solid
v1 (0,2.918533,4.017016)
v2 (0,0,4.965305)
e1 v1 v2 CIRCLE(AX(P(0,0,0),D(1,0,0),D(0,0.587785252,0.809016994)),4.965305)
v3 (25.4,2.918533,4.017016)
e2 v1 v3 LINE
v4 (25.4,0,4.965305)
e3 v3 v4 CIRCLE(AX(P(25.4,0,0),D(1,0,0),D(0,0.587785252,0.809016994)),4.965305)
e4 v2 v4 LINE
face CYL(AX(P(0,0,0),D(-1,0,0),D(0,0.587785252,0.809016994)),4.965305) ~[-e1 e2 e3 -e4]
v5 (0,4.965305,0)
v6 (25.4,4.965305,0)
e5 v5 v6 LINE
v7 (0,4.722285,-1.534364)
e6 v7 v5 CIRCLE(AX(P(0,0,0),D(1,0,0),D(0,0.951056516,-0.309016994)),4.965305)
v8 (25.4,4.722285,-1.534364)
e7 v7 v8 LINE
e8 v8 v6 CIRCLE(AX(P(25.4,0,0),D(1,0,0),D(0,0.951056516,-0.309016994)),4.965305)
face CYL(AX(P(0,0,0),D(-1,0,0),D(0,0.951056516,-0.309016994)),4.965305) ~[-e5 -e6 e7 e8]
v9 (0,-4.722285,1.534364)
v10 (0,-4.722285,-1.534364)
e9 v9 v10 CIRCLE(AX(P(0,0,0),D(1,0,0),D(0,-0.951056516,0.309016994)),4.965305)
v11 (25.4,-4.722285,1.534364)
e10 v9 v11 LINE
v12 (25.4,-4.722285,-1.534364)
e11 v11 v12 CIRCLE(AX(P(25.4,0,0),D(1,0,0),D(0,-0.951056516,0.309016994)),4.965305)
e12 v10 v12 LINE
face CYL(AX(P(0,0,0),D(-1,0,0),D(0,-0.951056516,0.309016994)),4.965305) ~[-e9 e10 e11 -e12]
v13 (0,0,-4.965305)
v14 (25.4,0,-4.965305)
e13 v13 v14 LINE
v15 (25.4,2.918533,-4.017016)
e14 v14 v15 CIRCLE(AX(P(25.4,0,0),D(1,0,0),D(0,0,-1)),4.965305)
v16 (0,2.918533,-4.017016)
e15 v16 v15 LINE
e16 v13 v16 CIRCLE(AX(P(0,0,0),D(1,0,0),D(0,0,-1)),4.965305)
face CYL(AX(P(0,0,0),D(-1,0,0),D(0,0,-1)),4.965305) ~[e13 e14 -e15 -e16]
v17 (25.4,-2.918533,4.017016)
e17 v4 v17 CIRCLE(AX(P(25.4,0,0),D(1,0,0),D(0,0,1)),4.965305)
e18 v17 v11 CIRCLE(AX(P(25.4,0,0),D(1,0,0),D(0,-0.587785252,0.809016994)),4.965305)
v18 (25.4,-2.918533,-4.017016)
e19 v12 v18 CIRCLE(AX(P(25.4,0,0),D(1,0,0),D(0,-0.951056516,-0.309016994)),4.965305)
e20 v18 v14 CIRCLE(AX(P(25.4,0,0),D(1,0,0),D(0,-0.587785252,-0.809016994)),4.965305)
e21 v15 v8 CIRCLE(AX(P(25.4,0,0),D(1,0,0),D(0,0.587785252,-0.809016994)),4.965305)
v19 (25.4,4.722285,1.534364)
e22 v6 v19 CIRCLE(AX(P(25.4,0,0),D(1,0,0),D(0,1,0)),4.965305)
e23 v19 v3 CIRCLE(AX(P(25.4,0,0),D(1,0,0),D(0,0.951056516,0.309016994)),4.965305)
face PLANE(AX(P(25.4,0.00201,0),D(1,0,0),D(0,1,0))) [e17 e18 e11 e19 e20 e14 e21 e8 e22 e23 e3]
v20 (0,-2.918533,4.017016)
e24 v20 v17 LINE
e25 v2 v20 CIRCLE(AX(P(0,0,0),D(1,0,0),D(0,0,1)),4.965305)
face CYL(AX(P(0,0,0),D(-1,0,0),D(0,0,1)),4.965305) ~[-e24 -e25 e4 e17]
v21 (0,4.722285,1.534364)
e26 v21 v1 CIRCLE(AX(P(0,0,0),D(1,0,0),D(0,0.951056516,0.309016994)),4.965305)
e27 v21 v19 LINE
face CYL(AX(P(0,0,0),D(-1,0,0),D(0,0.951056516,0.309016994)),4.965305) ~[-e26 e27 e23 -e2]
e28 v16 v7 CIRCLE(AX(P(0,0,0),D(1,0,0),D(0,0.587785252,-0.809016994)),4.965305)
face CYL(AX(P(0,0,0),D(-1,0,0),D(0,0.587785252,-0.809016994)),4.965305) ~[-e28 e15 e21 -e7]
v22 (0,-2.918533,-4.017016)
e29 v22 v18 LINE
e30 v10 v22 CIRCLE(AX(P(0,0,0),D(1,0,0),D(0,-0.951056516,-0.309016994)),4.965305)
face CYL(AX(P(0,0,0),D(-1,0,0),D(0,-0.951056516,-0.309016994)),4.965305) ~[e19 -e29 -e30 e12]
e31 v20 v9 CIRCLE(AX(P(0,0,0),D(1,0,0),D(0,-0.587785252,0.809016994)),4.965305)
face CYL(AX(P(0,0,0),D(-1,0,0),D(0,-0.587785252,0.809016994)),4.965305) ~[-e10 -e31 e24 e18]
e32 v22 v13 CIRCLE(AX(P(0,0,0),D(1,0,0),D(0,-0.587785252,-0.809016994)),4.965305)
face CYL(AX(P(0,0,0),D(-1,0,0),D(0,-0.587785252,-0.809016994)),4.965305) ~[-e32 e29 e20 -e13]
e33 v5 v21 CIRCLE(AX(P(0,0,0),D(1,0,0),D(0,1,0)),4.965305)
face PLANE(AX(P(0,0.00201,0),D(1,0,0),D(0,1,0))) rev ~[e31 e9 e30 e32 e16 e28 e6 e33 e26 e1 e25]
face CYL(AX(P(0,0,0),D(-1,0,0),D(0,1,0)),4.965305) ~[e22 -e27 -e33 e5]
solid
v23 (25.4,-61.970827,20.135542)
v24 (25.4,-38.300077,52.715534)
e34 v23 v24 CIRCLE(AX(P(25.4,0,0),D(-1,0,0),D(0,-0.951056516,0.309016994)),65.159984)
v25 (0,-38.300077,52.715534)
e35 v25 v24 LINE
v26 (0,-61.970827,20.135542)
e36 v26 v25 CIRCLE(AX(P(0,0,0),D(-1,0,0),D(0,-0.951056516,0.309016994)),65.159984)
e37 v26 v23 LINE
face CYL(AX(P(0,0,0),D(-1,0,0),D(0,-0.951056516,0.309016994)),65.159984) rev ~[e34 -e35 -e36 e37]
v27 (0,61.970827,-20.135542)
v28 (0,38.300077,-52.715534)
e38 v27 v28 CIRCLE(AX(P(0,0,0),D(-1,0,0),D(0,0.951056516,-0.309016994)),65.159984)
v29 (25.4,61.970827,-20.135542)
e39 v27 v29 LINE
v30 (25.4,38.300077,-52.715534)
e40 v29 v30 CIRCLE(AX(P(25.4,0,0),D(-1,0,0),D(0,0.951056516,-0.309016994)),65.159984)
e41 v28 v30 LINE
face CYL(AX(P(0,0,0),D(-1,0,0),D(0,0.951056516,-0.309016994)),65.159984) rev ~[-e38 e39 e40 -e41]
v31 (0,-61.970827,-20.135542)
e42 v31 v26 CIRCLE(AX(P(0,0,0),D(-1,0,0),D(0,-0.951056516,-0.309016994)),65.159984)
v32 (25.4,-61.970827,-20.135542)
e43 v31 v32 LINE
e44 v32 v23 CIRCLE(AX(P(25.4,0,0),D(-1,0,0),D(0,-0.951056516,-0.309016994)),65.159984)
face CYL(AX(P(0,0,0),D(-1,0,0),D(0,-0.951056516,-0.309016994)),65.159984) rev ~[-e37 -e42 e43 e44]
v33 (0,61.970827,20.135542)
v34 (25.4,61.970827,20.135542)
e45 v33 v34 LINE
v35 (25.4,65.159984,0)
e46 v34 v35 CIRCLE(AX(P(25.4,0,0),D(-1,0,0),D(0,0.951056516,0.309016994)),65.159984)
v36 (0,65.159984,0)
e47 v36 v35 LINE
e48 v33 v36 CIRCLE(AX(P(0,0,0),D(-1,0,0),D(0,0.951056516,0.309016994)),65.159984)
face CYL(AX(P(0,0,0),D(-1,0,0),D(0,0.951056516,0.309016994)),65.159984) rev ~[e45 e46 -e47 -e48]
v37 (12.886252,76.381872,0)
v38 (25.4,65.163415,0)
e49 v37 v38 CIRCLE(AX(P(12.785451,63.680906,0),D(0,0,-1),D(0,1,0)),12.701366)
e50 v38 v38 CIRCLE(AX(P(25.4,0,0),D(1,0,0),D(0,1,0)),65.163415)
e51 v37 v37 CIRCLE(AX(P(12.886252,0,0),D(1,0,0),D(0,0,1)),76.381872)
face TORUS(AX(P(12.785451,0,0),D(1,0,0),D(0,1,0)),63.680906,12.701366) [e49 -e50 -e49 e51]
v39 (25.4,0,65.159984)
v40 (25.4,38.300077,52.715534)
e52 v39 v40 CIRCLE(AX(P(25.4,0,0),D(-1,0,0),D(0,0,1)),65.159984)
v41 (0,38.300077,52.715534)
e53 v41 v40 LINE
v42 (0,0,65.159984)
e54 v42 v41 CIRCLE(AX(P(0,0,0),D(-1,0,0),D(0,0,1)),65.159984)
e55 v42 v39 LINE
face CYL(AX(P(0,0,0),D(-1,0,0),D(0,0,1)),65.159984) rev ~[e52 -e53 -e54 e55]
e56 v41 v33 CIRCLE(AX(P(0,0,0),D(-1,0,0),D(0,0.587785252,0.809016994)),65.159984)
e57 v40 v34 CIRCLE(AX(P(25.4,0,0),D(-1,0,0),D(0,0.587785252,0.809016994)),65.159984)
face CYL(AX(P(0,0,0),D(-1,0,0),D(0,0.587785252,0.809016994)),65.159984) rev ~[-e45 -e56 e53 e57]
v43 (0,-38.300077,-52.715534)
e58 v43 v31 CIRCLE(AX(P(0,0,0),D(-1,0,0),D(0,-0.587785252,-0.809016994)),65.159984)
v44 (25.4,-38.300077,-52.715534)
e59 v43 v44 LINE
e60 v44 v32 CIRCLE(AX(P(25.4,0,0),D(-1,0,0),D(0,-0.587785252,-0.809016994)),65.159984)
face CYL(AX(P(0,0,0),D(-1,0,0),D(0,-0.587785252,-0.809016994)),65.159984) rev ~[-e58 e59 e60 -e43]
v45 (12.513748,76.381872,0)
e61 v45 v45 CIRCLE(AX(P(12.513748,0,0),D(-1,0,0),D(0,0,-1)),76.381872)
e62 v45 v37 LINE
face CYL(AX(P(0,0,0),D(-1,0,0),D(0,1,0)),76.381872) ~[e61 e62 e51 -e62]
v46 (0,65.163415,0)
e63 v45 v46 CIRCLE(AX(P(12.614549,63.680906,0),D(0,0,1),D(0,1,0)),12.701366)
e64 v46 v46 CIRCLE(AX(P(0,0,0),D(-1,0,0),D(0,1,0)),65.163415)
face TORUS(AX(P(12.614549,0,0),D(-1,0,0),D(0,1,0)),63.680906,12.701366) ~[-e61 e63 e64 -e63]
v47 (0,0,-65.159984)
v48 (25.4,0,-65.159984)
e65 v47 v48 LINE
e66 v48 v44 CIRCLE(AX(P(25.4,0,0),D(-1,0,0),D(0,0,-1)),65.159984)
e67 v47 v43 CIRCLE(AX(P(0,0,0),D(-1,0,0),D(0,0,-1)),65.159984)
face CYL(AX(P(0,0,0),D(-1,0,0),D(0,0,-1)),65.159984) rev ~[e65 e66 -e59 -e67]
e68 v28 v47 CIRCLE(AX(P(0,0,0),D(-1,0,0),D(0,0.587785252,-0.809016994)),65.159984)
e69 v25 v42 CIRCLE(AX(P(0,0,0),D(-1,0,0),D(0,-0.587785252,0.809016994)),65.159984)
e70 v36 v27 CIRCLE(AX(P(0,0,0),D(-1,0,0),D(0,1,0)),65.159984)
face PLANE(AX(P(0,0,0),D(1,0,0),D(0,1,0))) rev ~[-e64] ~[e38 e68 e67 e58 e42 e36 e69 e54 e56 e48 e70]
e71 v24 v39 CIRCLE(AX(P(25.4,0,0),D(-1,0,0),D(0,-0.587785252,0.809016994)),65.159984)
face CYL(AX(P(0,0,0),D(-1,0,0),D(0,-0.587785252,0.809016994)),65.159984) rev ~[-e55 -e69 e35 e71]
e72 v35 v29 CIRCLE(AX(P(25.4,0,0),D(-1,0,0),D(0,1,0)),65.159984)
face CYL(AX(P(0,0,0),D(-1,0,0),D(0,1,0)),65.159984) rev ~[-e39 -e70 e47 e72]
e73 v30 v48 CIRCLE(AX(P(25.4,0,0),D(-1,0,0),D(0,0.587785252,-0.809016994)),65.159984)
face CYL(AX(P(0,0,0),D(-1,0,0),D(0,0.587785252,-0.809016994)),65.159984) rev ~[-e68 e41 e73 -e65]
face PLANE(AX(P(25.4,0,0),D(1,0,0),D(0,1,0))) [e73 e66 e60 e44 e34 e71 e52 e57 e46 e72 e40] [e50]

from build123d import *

# Parameters (mm, degrees)
F0_R     = 76.3818717889
F3_DEPTH = 25.4
F4_DEPTH = 25.4


# Not quite as in the source:
# - a fillet or chamfer that OpenCascade refuses, or shapes differently, is made with other operations: its cross-section is extruded or revolved along the edge and cut away or added
# - the program builds the solid bodies; features that only make, move or delete a surface that nothing else refers to are left out


with BuildPart() as f3:
    # F0 (on Right) → F3 (new body)
    with BuildSketch(Plane.YZ):
        Circle(F0_R)
        with BuildLine():
            ThreePointArc((61.9708271601, 20.1355423362), (64.3577562368, 10.1932672021), (65.1599837637, 0))
            ThreePointArc((65.1599837637, 0), (64.3577562368, -10.1932672021), (61.9708271601, -20.1355423362))
            ThreePointArc((61.9708271601, -20.1355423362), (52.715534218, -38.3000774959), (38.3000774959, -52.715534218))
            ThreePointArc((38.3000774959, -52.715534218), (20.1355423362, -61.9708271601), (0, -65.1599837637))
            ThreePointArc((0, -65.1599837637), (-20.1355423362, -61.9708271601), (-38.3000774959, -52.715534218))
            ThreePointArc((-38.3000774959, -52.715534218), (-52.715534218, -38.3000774959), (-61.9708271601, -20.1355423362))
            ThreePointArc((-61.9708271601, -20.1355423362), (-65.1599837637, 0), (-61.9708271601, 20.1355423362))
            ThreePointArc((-61.9708271601, 20.1355423362), (-52.715534218, 38.3000774959), (-38.3000774959, 52.715534218))
            ThreePointArc((-38.3000774959, 52.715534218), (-20.1355423362, 61.9708271601), (0, 65.1599837637))
            ThreePointArc((0, 65.1599837637), (20.1355423362, 61.9708271601), (38.3000774959, 52.715534218))
            ThreePointArc((38.3000774959, 52.715534218), (52.715534218, 38.3000774959), (61.9708271601, 20.1355423362))
        make_face(mode=Mode.SUBTRACT)
    extrude(amount=F3_DEPTH)

    # F5: fillet of radius 12.7 on 1 edges, made by hand

    # F5_s1 → F5_t2 (revolve, cut)
    with BuildSketch(Plane.XY):
        with BuildLine():
            ThreePointArc((12.7854505187, 76.3822717889), (21.2275412664, 73.1706792347), (25.4003972784, 65.1600303453))
            Line((25.4003972784, 65.1600303453), (26.6618919544, 65.3079427695))
            ThreePointArc((26.6618919544, 65.3079427695), (26.6701365685, 70.7709510671), (26.6701365685, 76.3818717889))
            Line((26.6701365685, 76.3818717889), (25.4, 77.6520083575))
            ThreePointArc((25.4, 77.6520083575), (19.0927252593, 77.6520083575), (12.7854505187, 77.6524083575))
            Line((12.7854505187, 77.6524083575), (12.7854505187, 76.3822717889))
        make_face()
    revolve(axis=Axis((25.4, 0, 0), (1, 0, 0)), mode=Mode.SUBTRACT)

    # F6: fillet of radius 12.7 on 3 edges, made by hand

    # F6_s1 → F6_t2 (revolve, cut)
    with BuildSketch(Plane.XY):
        with BuildLine():
            ThreePointArc((12.6145494813, 76.3822717889), (4.1724587336, 73.1706792347), (-0.0003972784, 65.1600303453))
            Line((-0.0003972784, 65.1600303453), (-1.2618919544, 65.3079427695))
            ThreePointArc((-1.2618919544, 65.3079427695), (-1.2701365685, 70.7709510671), (-1.2701365685, 76.3818717889))
            Line((-1.2701365685, 76.3818717889), (0, 77.6520083575))
            ThreePointArc((0, 77.6520083575), (6.3072747407, 77.6520083575), (12.6145494813, 77.6524083575))
            Line((12.6145494813, 77.6524083575), (12.6145494813, 76.3822717889))
        make_face()
    revolve(axis=Axis((0, 0, 0), (1, 0, 0)), mode=Mode.SUBTRACT)


with BuildPart() as f4:
    # F0 (on Right) → F4 (new body)
    with BuildSketch(Plane.YZ):
        with BuildLine():
            ThreePointArc((4.9653046516, 0), (4.9041735119, 0.7767447769), (4.7222853443, 1.5343635196))
            ThreePointArc((4.7222853443, 1.5343635196), (4.0170158454, 2.9185328474), (2.9185328474, 4.0170158454))
            ThreePointArc((2.9185328474, 4.0170158454), (1.5343635196, 4.7222853443), (0, 4.9653046516))
            ThreePointArc((0, 4.9653046516), (-1.5343635196, 4.7222853443), (-2.9185328474, 4.0170158454))
            ThreePointArc((-2.9185328474, 4.0170158454), (-4.0170158454, 2.9185328474), (-4.7222853443, 1.5343635196))
            ThreePointArc((-4.7222853443, 1.5343635196), (-4.9653046516, 0), (-4.7222853443, -1.5343635196))
            ThreePointArc((-4.7222853443, -1.5343635196), (-4.0170158454, -2.9185328474), (-2.9185328474, -4.0170158454))
            ThreePointArc((-2.9185328474, -4.0170158454), (-1.5343635196, -4.7222853443), (0, -4.9653046516))
            ThreePointArc((0, -4.9653046516), (1.5343635196, -4.7222853443), (2.9185328474, -4.0170158454))
            ThreePointArc((2.9185328474, -4.0170158454), (4.0170158454, -2.9185328474), (4.7222853443, -1.5343635196))
            ThreePointArc((4.7222853443, -1.5343635196), (4.9041735119, -0.7767447769), (4.9653046516, 0))
        make_face()
    extrude(amount=F4_DEPTH)


solid = Compound([f3.part, f4.part])
